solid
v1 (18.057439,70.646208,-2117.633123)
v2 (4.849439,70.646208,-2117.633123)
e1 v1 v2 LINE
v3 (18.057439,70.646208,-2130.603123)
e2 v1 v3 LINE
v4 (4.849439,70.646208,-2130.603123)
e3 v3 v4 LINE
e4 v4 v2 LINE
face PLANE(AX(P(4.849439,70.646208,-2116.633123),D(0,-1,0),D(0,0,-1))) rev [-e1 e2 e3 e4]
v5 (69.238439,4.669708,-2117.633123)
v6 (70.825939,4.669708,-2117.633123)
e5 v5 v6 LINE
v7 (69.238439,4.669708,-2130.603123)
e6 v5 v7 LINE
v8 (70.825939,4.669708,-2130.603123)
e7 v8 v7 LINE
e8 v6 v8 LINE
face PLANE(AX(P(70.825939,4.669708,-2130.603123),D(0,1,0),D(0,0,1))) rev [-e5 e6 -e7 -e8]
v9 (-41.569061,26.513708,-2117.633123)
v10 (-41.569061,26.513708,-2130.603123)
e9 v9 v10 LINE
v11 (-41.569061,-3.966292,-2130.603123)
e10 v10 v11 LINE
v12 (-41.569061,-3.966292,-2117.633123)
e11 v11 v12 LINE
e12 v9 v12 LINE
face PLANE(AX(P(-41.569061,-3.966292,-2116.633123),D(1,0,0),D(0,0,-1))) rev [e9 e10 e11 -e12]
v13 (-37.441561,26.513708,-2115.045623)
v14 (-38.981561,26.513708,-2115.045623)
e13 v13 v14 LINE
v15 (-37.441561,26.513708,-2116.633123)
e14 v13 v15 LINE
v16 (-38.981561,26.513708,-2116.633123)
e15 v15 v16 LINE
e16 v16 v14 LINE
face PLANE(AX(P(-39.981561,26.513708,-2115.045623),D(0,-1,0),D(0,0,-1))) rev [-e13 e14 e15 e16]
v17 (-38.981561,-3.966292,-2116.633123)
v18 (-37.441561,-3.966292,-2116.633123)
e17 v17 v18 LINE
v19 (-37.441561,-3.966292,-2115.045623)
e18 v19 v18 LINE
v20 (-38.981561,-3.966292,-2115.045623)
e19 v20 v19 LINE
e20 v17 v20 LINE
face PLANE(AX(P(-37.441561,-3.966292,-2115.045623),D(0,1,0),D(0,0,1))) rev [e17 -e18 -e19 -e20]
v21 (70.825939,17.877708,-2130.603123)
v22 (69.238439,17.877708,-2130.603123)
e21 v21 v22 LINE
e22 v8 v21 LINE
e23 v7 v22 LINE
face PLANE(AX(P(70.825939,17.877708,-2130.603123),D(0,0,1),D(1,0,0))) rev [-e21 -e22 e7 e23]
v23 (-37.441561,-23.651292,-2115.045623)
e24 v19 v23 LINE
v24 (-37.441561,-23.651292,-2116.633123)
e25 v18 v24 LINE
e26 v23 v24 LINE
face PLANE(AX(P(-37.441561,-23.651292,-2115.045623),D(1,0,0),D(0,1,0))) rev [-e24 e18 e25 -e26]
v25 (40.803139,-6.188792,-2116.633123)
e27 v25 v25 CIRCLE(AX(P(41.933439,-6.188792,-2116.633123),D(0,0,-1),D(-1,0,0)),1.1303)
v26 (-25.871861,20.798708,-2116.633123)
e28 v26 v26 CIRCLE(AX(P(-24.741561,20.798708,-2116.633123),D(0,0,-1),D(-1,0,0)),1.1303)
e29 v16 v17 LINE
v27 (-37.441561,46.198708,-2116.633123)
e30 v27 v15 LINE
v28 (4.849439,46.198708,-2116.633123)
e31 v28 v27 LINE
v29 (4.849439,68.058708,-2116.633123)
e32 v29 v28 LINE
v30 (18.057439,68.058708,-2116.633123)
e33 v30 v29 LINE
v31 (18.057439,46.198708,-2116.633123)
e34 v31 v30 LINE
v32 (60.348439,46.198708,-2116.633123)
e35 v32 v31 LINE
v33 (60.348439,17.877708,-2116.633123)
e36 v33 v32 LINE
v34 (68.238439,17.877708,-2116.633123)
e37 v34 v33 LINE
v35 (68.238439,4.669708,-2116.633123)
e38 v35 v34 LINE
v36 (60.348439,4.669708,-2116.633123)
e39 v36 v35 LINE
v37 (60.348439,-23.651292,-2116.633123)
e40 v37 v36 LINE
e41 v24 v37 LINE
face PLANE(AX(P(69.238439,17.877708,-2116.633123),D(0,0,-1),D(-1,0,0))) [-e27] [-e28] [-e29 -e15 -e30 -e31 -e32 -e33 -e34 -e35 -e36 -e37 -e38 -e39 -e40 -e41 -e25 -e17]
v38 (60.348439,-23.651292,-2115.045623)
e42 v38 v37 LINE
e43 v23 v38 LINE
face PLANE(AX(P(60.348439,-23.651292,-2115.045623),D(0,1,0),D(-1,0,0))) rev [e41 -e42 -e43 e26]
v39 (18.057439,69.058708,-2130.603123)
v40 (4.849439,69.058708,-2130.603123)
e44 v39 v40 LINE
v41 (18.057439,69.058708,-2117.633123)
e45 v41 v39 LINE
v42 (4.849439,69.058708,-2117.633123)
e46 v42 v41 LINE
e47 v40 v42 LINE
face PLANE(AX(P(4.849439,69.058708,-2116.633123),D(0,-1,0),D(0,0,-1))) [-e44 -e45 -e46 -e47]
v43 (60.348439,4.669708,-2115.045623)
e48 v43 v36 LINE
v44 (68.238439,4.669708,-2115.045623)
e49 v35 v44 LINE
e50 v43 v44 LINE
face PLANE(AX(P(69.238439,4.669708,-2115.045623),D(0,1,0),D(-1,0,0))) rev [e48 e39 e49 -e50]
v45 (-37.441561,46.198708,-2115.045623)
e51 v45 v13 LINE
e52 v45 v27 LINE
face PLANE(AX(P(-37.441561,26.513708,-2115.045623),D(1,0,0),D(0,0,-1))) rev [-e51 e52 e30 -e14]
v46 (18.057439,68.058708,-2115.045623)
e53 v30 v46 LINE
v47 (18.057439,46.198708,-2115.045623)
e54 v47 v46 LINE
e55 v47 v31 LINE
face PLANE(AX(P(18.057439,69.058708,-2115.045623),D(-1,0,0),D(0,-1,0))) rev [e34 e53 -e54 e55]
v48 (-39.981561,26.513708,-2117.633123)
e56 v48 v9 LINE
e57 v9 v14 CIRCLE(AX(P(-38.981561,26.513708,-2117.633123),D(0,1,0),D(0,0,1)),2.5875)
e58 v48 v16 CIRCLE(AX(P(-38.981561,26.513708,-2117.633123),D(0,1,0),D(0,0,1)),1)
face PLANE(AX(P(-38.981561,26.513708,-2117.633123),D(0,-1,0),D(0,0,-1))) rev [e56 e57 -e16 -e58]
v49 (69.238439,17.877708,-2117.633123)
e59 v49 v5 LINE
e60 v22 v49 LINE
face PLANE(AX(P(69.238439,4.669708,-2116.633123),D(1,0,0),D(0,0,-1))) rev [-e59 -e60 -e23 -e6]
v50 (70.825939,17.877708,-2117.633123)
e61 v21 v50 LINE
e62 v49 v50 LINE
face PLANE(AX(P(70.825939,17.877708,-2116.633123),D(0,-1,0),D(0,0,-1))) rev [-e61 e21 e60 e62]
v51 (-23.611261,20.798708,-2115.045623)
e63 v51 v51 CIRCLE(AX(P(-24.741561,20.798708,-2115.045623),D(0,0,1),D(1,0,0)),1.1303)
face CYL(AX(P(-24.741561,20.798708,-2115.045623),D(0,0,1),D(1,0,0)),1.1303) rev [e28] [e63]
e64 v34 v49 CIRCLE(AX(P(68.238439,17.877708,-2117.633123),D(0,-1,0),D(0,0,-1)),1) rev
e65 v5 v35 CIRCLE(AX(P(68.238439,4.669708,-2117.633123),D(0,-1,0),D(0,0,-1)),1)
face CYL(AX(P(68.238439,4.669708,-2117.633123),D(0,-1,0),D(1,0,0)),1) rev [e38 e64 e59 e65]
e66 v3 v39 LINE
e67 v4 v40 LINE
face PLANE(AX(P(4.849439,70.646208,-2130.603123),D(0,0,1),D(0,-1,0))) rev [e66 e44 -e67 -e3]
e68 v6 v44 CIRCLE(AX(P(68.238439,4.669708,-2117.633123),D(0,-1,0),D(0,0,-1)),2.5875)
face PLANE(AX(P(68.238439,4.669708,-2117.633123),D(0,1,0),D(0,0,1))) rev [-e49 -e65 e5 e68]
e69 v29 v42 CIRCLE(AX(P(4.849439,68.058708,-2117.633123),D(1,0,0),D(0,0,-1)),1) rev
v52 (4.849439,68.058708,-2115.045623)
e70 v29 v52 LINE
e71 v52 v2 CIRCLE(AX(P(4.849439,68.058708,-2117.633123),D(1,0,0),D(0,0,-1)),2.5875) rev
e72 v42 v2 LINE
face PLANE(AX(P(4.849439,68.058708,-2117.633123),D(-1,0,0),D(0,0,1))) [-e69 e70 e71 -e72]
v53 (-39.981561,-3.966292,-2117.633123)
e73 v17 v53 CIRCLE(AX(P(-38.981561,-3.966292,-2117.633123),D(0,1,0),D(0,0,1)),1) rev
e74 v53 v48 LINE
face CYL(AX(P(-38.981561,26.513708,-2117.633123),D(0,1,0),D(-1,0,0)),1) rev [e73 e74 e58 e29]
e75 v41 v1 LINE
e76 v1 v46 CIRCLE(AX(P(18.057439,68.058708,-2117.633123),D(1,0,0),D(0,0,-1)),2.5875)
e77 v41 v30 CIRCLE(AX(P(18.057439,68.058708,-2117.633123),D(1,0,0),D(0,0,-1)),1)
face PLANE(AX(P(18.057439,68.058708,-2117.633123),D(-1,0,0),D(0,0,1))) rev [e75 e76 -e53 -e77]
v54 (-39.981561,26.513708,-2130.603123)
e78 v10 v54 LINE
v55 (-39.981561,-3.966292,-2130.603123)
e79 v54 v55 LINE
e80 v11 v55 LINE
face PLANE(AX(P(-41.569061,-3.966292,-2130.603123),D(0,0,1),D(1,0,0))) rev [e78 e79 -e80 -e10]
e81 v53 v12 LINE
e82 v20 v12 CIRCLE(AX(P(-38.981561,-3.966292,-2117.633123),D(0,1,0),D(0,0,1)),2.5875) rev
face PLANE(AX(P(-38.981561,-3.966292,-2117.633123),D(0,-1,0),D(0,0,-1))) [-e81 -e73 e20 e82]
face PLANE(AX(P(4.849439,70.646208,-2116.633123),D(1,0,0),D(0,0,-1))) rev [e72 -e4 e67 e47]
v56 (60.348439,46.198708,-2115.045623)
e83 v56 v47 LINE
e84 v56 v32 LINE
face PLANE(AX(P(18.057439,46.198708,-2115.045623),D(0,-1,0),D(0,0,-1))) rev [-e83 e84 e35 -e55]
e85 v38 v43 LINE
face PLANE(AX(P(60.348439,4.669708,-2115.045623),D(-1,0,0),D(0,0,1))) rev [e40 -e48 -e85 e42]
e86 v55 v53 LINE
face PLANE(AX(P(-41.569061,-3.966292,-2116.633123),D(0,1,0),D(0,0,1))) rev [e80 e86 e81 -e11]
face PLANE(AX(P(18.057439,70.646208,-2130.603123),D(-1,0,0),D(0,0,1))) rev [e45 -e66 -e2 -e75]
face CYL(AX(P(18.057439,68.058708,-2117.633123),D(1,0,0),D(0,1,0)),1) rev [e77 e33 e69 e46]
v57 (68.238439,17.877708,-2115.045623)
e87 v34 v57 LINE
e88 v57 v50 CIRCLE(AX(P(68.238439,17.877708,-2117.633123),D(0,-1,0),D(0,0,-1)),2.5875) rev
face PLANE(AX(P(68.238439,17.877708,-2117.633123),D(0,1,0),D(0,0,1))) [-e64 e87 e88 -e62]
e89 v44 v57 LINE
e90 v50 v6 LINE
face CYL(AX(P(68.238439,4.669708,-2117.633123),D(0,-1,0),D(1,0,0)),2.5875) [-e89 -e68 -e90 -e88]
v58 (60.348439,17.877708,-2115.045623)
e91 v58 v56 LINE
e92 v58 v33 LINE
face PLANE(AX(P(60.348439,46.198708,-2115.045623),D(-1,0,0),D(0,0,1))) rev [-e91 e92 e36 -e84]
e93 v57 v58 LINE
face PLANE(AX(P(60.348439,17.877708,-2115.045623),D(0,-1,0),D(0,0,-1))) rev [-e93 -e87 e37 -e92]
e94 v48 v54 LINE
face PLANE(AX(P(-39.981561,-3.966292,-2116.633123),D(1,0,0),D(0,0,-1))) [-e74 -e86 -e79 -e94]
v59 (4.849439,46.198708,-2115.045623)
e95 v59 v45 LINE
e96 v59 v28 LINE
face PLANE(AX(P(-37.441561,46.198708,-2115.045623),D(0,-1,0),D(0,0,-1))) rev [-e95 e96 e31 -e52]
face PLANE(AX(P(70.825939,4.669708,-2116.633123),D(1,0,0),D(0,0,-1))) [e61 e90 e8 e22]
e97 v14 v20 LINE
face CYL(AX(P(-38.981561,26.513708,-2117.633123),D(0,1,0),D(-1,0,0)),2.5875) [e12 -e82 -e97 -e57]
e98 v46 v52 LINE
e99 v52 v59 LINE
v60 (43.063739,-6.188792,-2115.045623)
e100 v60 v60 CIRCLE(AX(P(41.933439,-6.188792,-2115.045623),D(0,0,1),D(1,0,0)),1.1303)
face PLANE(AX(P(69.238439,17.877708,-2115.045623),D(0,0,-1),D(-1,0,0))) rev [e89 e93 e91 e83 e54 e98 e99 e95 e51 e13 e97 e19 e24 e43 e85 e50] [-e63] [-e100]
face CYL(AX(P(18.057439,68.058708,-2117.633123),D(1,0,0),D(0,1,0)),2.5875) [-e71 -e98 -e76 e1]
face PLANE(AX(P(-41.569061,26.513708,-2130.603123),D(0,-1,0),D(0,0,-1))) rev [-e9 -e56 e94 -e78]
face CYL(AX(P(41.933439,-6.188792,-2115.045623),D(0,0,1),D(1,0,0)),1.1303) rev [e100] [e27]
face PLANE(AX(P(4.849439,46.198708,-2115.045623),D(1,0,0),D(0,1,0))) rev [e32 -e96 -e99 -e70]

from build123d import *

# Parameters (mm, degrees)
BASE_FLANGE1_DEPTH             = 1.5875
EDGE_FLANGE1_STRIP_W           = 8.35
EDGE_FLANGE1_STRIP_H           = 1.5875
EDGE_FLANGE1_STRIP_CUT_DEPTH   = 30.48
EDGE_FLANGE1_STRIP_2_W         = 8.35
EDGE_FLANGE1_STRIP_2_H         = 1.5875
EDGE_FLANGE1_STRIP_CUT_2_DEPTH = 13.208
EDGE_FLANGE1_STRIP_3_W         = 8.35
EDGE_FLANGE1_STRIP_3_H         = 1.5875
EDGE_FLANGE1_STRIP_CUT_3_DEPTH = 13.208
EDGE_FLANGE1_DEPTH             = 30.48
EDGE_FLANGE1_BEND_DEPTH        = 13.208
EDGE_FLANGE1_BEND_2_DEPTH      = 13.208
F_4_40_TAPPED_HOLE2_D          = 2.2606
F_4_40_TAPPED_HOLE2_DEPTH      = 7.62
F_4_40_TAPPED_HOLE2_TIP        = 0.679152758


# Sheet-metal steps are written as plain solids
with BuildPart() as part:
    # Sketch4 → Base-Flange1 (new body)
    with BuildSketch(Plane.XY.offset(-2116.63312276)):
        Polygon((69.238438529, 17.87770801), (69.238438529, 4.66970801), (60.348438529, 4.66970801), (60.348438529, -23.65129199), (-37.441561471, -23.65129199), (-37.441561471, -3.96629199), (-39.981561471, -3.96629199), (-39.981561471, 26.51370801), (-37.441561471, 26.51370801), (-37.441561471, 46.19870801), (4.849438529, 46.19870801), (4.849438529, 69.05870801), (18.057438529, 69.05870801), (18.057438529, 46.19870801), (60.348438529, 46.19870801), (60.348438529, 17.87770801), align=None)
    extrude(amount=BASE_FLANGE1_DEPTH)

    # Edge-Flange1 strip (across the edge) → Edge-Flange1 strip cut (cut)
    with BuildSketch(Plane(origin=(-39.981561471, -3.96629199, -2116.63312276), x_dir=(1, 0, 0), z_dir=(0, 1, 0))):
        with Locations((-3.175, -0.79375)):
            Rectangle(EDGE_FLANGE1_STRIP_W, EDGE_FLANGE1_STRIP_H)
    extrude(amount=EDGE_FLANGE1_STRIP_CUT_DEPTH, mode=Mode.SUBTRACT)

    # Edge-Flange1 strip 2 (across the edge) → Edge-Flange1 strip cut 2 (cut)
    with BuildSketch(Plane(origin=(4.849438529, 69.05870801, -2116.63312276), x_dir=(0, -1, 0), z_dir=(1, 0, 0))):
        with Locations((-3.175, -0.79375)):
            Rectangle(EDGE_FLANGE1_STRIP_2_W, EDGE_FLANGE1_STRIP_2_H)
    extrude(amount=EDGE_FLANGE1_STRIP_CUT_2_DEPTH, mode=Mode.SUBTRACT)

    # Edge-Flange1 strip 3 (across the edge) → Edge-Flange1 strip cut 3 (cut)
    with BuildSketch(Plane(origin=(69.238438529, 17.87770801, -2116.63312276), x_dir=(-1, 0, 0), z_dir=(0, -1, 0))):
        with Locations((-3.175, -0.79375)):
            Rectangle(EDGE_FLANGE1_STRIP_3_W, EDGE_FLANGE1_STRIP_3_H)
    extrude(amount=EDGE_FLANGE1_STRIP_CUT_3_DEPTH, mode=Mode.SUBTRACT)

    # Edge-Flange1 section (across the edge) → Edge-Flange1 (add)
    with BuildSketch(Plane(origin=(-39.981561471, -3.96629199, -2116.63312276), x_dir=(1, 0, 0), z_dir=(0, 1, 0))):
        with BuildLine():
            Line((-1.5875, 1), (-1.5875, 13.97))
            Line((-1.5875, 13.97), (0, 13.97))
            Line((0, 13.97), (0, 1))
            ThreePointArc((0, 1), (0.292893219, 0.292893219), (1, 0))
            Line((1, 0), (1, -1.5875))
            ThreePointArc((1, -1.5875), (-0.829638796, -0.829638796), (-1.5875, 1))
        make_face()
    extrude(amount=EDGE_FLANGE1_DEPTH)

    # Edge-Flange1 section 2 (across the edge) → Edge-Flange1 bend (add)
    with BuildSketch(Plane(origin=(4.849438529, 69.05870801, -2116.63312276), x_dir=(0, -1, 0), z_dir=(1, 0, 0))):
        with BuildLine():
            Line((-1.5875, 1), (-1.5875, 13.97))
            Line((-1.5875, 13.97), (0, 13.97))
            Line((0, 13.97), (0, 1))
            ThreePointArc((0, 1), (0.292893219, 0.292893219), (1, 0))
            Line((1, 0), (1, -1.5875))
            ThreePointArc((1, -1.5875), (-0.829638796, -0.829638796), (-1.5875, 1))
        make_face()
    extrude(amount=EDGE_FLANGE1_BEND_DEPTH)

    # Edge-Flange1 section 3 (across the edge) → Edge-Flange1 bend 2 (add)
    with BuildSketch(Plane(origin=(69.238438529, 17.87770801, -2116.63312276), x_dir=(-1, 0, 0), z_dir=(0, -1, 0))):
        with BuildLine():
            Line((-1.5875, 1), (-1.5875, 13.97))
            Line((-1.5875, 13.97), (0, 13.97))
            Line((0, 13.97), (0, 1))
            ThreePointArc((0, 1), (0.292893219, 0.292893219), (1, 0))
            Line((1, 0), (1, -1.5875))
            ThreePointArc((1, -1.5875), (-0.829638796, -0.829638796), (-1.5875, 1))
        make_face()
    extrude(amount=EDGE_FLANGE1_BEND_2_DEPTH)

    # #4-40 Tapped Hole2
    with Locations(Plane(origin=(41.933438529, -6.18879199, -2115.04562276), x_dir=(1, 0, 0), z_dir=(0, 0, 1))):
        with Locations((0, 0), (-66.675, 26.9875)):
            Hole(F_4_40_TAPPED_HOLE2_D / 2, depth=F_4_40_TAPPED_HOLE2_DEPTH)
            with Locations((0, 0, -(F_4_40_TAPPED_HOLE2_DEPTH + F_4_40_TAPPED_HOLE2_TIP / 2))):  # 118° drill point
                Cone(0, F_4_40_TAPPED_HOLE2_D / 2, F_4_40_TAPPED_HOLE2_TIP, mode=Mode.SUBTRACT)


solid = part.part
